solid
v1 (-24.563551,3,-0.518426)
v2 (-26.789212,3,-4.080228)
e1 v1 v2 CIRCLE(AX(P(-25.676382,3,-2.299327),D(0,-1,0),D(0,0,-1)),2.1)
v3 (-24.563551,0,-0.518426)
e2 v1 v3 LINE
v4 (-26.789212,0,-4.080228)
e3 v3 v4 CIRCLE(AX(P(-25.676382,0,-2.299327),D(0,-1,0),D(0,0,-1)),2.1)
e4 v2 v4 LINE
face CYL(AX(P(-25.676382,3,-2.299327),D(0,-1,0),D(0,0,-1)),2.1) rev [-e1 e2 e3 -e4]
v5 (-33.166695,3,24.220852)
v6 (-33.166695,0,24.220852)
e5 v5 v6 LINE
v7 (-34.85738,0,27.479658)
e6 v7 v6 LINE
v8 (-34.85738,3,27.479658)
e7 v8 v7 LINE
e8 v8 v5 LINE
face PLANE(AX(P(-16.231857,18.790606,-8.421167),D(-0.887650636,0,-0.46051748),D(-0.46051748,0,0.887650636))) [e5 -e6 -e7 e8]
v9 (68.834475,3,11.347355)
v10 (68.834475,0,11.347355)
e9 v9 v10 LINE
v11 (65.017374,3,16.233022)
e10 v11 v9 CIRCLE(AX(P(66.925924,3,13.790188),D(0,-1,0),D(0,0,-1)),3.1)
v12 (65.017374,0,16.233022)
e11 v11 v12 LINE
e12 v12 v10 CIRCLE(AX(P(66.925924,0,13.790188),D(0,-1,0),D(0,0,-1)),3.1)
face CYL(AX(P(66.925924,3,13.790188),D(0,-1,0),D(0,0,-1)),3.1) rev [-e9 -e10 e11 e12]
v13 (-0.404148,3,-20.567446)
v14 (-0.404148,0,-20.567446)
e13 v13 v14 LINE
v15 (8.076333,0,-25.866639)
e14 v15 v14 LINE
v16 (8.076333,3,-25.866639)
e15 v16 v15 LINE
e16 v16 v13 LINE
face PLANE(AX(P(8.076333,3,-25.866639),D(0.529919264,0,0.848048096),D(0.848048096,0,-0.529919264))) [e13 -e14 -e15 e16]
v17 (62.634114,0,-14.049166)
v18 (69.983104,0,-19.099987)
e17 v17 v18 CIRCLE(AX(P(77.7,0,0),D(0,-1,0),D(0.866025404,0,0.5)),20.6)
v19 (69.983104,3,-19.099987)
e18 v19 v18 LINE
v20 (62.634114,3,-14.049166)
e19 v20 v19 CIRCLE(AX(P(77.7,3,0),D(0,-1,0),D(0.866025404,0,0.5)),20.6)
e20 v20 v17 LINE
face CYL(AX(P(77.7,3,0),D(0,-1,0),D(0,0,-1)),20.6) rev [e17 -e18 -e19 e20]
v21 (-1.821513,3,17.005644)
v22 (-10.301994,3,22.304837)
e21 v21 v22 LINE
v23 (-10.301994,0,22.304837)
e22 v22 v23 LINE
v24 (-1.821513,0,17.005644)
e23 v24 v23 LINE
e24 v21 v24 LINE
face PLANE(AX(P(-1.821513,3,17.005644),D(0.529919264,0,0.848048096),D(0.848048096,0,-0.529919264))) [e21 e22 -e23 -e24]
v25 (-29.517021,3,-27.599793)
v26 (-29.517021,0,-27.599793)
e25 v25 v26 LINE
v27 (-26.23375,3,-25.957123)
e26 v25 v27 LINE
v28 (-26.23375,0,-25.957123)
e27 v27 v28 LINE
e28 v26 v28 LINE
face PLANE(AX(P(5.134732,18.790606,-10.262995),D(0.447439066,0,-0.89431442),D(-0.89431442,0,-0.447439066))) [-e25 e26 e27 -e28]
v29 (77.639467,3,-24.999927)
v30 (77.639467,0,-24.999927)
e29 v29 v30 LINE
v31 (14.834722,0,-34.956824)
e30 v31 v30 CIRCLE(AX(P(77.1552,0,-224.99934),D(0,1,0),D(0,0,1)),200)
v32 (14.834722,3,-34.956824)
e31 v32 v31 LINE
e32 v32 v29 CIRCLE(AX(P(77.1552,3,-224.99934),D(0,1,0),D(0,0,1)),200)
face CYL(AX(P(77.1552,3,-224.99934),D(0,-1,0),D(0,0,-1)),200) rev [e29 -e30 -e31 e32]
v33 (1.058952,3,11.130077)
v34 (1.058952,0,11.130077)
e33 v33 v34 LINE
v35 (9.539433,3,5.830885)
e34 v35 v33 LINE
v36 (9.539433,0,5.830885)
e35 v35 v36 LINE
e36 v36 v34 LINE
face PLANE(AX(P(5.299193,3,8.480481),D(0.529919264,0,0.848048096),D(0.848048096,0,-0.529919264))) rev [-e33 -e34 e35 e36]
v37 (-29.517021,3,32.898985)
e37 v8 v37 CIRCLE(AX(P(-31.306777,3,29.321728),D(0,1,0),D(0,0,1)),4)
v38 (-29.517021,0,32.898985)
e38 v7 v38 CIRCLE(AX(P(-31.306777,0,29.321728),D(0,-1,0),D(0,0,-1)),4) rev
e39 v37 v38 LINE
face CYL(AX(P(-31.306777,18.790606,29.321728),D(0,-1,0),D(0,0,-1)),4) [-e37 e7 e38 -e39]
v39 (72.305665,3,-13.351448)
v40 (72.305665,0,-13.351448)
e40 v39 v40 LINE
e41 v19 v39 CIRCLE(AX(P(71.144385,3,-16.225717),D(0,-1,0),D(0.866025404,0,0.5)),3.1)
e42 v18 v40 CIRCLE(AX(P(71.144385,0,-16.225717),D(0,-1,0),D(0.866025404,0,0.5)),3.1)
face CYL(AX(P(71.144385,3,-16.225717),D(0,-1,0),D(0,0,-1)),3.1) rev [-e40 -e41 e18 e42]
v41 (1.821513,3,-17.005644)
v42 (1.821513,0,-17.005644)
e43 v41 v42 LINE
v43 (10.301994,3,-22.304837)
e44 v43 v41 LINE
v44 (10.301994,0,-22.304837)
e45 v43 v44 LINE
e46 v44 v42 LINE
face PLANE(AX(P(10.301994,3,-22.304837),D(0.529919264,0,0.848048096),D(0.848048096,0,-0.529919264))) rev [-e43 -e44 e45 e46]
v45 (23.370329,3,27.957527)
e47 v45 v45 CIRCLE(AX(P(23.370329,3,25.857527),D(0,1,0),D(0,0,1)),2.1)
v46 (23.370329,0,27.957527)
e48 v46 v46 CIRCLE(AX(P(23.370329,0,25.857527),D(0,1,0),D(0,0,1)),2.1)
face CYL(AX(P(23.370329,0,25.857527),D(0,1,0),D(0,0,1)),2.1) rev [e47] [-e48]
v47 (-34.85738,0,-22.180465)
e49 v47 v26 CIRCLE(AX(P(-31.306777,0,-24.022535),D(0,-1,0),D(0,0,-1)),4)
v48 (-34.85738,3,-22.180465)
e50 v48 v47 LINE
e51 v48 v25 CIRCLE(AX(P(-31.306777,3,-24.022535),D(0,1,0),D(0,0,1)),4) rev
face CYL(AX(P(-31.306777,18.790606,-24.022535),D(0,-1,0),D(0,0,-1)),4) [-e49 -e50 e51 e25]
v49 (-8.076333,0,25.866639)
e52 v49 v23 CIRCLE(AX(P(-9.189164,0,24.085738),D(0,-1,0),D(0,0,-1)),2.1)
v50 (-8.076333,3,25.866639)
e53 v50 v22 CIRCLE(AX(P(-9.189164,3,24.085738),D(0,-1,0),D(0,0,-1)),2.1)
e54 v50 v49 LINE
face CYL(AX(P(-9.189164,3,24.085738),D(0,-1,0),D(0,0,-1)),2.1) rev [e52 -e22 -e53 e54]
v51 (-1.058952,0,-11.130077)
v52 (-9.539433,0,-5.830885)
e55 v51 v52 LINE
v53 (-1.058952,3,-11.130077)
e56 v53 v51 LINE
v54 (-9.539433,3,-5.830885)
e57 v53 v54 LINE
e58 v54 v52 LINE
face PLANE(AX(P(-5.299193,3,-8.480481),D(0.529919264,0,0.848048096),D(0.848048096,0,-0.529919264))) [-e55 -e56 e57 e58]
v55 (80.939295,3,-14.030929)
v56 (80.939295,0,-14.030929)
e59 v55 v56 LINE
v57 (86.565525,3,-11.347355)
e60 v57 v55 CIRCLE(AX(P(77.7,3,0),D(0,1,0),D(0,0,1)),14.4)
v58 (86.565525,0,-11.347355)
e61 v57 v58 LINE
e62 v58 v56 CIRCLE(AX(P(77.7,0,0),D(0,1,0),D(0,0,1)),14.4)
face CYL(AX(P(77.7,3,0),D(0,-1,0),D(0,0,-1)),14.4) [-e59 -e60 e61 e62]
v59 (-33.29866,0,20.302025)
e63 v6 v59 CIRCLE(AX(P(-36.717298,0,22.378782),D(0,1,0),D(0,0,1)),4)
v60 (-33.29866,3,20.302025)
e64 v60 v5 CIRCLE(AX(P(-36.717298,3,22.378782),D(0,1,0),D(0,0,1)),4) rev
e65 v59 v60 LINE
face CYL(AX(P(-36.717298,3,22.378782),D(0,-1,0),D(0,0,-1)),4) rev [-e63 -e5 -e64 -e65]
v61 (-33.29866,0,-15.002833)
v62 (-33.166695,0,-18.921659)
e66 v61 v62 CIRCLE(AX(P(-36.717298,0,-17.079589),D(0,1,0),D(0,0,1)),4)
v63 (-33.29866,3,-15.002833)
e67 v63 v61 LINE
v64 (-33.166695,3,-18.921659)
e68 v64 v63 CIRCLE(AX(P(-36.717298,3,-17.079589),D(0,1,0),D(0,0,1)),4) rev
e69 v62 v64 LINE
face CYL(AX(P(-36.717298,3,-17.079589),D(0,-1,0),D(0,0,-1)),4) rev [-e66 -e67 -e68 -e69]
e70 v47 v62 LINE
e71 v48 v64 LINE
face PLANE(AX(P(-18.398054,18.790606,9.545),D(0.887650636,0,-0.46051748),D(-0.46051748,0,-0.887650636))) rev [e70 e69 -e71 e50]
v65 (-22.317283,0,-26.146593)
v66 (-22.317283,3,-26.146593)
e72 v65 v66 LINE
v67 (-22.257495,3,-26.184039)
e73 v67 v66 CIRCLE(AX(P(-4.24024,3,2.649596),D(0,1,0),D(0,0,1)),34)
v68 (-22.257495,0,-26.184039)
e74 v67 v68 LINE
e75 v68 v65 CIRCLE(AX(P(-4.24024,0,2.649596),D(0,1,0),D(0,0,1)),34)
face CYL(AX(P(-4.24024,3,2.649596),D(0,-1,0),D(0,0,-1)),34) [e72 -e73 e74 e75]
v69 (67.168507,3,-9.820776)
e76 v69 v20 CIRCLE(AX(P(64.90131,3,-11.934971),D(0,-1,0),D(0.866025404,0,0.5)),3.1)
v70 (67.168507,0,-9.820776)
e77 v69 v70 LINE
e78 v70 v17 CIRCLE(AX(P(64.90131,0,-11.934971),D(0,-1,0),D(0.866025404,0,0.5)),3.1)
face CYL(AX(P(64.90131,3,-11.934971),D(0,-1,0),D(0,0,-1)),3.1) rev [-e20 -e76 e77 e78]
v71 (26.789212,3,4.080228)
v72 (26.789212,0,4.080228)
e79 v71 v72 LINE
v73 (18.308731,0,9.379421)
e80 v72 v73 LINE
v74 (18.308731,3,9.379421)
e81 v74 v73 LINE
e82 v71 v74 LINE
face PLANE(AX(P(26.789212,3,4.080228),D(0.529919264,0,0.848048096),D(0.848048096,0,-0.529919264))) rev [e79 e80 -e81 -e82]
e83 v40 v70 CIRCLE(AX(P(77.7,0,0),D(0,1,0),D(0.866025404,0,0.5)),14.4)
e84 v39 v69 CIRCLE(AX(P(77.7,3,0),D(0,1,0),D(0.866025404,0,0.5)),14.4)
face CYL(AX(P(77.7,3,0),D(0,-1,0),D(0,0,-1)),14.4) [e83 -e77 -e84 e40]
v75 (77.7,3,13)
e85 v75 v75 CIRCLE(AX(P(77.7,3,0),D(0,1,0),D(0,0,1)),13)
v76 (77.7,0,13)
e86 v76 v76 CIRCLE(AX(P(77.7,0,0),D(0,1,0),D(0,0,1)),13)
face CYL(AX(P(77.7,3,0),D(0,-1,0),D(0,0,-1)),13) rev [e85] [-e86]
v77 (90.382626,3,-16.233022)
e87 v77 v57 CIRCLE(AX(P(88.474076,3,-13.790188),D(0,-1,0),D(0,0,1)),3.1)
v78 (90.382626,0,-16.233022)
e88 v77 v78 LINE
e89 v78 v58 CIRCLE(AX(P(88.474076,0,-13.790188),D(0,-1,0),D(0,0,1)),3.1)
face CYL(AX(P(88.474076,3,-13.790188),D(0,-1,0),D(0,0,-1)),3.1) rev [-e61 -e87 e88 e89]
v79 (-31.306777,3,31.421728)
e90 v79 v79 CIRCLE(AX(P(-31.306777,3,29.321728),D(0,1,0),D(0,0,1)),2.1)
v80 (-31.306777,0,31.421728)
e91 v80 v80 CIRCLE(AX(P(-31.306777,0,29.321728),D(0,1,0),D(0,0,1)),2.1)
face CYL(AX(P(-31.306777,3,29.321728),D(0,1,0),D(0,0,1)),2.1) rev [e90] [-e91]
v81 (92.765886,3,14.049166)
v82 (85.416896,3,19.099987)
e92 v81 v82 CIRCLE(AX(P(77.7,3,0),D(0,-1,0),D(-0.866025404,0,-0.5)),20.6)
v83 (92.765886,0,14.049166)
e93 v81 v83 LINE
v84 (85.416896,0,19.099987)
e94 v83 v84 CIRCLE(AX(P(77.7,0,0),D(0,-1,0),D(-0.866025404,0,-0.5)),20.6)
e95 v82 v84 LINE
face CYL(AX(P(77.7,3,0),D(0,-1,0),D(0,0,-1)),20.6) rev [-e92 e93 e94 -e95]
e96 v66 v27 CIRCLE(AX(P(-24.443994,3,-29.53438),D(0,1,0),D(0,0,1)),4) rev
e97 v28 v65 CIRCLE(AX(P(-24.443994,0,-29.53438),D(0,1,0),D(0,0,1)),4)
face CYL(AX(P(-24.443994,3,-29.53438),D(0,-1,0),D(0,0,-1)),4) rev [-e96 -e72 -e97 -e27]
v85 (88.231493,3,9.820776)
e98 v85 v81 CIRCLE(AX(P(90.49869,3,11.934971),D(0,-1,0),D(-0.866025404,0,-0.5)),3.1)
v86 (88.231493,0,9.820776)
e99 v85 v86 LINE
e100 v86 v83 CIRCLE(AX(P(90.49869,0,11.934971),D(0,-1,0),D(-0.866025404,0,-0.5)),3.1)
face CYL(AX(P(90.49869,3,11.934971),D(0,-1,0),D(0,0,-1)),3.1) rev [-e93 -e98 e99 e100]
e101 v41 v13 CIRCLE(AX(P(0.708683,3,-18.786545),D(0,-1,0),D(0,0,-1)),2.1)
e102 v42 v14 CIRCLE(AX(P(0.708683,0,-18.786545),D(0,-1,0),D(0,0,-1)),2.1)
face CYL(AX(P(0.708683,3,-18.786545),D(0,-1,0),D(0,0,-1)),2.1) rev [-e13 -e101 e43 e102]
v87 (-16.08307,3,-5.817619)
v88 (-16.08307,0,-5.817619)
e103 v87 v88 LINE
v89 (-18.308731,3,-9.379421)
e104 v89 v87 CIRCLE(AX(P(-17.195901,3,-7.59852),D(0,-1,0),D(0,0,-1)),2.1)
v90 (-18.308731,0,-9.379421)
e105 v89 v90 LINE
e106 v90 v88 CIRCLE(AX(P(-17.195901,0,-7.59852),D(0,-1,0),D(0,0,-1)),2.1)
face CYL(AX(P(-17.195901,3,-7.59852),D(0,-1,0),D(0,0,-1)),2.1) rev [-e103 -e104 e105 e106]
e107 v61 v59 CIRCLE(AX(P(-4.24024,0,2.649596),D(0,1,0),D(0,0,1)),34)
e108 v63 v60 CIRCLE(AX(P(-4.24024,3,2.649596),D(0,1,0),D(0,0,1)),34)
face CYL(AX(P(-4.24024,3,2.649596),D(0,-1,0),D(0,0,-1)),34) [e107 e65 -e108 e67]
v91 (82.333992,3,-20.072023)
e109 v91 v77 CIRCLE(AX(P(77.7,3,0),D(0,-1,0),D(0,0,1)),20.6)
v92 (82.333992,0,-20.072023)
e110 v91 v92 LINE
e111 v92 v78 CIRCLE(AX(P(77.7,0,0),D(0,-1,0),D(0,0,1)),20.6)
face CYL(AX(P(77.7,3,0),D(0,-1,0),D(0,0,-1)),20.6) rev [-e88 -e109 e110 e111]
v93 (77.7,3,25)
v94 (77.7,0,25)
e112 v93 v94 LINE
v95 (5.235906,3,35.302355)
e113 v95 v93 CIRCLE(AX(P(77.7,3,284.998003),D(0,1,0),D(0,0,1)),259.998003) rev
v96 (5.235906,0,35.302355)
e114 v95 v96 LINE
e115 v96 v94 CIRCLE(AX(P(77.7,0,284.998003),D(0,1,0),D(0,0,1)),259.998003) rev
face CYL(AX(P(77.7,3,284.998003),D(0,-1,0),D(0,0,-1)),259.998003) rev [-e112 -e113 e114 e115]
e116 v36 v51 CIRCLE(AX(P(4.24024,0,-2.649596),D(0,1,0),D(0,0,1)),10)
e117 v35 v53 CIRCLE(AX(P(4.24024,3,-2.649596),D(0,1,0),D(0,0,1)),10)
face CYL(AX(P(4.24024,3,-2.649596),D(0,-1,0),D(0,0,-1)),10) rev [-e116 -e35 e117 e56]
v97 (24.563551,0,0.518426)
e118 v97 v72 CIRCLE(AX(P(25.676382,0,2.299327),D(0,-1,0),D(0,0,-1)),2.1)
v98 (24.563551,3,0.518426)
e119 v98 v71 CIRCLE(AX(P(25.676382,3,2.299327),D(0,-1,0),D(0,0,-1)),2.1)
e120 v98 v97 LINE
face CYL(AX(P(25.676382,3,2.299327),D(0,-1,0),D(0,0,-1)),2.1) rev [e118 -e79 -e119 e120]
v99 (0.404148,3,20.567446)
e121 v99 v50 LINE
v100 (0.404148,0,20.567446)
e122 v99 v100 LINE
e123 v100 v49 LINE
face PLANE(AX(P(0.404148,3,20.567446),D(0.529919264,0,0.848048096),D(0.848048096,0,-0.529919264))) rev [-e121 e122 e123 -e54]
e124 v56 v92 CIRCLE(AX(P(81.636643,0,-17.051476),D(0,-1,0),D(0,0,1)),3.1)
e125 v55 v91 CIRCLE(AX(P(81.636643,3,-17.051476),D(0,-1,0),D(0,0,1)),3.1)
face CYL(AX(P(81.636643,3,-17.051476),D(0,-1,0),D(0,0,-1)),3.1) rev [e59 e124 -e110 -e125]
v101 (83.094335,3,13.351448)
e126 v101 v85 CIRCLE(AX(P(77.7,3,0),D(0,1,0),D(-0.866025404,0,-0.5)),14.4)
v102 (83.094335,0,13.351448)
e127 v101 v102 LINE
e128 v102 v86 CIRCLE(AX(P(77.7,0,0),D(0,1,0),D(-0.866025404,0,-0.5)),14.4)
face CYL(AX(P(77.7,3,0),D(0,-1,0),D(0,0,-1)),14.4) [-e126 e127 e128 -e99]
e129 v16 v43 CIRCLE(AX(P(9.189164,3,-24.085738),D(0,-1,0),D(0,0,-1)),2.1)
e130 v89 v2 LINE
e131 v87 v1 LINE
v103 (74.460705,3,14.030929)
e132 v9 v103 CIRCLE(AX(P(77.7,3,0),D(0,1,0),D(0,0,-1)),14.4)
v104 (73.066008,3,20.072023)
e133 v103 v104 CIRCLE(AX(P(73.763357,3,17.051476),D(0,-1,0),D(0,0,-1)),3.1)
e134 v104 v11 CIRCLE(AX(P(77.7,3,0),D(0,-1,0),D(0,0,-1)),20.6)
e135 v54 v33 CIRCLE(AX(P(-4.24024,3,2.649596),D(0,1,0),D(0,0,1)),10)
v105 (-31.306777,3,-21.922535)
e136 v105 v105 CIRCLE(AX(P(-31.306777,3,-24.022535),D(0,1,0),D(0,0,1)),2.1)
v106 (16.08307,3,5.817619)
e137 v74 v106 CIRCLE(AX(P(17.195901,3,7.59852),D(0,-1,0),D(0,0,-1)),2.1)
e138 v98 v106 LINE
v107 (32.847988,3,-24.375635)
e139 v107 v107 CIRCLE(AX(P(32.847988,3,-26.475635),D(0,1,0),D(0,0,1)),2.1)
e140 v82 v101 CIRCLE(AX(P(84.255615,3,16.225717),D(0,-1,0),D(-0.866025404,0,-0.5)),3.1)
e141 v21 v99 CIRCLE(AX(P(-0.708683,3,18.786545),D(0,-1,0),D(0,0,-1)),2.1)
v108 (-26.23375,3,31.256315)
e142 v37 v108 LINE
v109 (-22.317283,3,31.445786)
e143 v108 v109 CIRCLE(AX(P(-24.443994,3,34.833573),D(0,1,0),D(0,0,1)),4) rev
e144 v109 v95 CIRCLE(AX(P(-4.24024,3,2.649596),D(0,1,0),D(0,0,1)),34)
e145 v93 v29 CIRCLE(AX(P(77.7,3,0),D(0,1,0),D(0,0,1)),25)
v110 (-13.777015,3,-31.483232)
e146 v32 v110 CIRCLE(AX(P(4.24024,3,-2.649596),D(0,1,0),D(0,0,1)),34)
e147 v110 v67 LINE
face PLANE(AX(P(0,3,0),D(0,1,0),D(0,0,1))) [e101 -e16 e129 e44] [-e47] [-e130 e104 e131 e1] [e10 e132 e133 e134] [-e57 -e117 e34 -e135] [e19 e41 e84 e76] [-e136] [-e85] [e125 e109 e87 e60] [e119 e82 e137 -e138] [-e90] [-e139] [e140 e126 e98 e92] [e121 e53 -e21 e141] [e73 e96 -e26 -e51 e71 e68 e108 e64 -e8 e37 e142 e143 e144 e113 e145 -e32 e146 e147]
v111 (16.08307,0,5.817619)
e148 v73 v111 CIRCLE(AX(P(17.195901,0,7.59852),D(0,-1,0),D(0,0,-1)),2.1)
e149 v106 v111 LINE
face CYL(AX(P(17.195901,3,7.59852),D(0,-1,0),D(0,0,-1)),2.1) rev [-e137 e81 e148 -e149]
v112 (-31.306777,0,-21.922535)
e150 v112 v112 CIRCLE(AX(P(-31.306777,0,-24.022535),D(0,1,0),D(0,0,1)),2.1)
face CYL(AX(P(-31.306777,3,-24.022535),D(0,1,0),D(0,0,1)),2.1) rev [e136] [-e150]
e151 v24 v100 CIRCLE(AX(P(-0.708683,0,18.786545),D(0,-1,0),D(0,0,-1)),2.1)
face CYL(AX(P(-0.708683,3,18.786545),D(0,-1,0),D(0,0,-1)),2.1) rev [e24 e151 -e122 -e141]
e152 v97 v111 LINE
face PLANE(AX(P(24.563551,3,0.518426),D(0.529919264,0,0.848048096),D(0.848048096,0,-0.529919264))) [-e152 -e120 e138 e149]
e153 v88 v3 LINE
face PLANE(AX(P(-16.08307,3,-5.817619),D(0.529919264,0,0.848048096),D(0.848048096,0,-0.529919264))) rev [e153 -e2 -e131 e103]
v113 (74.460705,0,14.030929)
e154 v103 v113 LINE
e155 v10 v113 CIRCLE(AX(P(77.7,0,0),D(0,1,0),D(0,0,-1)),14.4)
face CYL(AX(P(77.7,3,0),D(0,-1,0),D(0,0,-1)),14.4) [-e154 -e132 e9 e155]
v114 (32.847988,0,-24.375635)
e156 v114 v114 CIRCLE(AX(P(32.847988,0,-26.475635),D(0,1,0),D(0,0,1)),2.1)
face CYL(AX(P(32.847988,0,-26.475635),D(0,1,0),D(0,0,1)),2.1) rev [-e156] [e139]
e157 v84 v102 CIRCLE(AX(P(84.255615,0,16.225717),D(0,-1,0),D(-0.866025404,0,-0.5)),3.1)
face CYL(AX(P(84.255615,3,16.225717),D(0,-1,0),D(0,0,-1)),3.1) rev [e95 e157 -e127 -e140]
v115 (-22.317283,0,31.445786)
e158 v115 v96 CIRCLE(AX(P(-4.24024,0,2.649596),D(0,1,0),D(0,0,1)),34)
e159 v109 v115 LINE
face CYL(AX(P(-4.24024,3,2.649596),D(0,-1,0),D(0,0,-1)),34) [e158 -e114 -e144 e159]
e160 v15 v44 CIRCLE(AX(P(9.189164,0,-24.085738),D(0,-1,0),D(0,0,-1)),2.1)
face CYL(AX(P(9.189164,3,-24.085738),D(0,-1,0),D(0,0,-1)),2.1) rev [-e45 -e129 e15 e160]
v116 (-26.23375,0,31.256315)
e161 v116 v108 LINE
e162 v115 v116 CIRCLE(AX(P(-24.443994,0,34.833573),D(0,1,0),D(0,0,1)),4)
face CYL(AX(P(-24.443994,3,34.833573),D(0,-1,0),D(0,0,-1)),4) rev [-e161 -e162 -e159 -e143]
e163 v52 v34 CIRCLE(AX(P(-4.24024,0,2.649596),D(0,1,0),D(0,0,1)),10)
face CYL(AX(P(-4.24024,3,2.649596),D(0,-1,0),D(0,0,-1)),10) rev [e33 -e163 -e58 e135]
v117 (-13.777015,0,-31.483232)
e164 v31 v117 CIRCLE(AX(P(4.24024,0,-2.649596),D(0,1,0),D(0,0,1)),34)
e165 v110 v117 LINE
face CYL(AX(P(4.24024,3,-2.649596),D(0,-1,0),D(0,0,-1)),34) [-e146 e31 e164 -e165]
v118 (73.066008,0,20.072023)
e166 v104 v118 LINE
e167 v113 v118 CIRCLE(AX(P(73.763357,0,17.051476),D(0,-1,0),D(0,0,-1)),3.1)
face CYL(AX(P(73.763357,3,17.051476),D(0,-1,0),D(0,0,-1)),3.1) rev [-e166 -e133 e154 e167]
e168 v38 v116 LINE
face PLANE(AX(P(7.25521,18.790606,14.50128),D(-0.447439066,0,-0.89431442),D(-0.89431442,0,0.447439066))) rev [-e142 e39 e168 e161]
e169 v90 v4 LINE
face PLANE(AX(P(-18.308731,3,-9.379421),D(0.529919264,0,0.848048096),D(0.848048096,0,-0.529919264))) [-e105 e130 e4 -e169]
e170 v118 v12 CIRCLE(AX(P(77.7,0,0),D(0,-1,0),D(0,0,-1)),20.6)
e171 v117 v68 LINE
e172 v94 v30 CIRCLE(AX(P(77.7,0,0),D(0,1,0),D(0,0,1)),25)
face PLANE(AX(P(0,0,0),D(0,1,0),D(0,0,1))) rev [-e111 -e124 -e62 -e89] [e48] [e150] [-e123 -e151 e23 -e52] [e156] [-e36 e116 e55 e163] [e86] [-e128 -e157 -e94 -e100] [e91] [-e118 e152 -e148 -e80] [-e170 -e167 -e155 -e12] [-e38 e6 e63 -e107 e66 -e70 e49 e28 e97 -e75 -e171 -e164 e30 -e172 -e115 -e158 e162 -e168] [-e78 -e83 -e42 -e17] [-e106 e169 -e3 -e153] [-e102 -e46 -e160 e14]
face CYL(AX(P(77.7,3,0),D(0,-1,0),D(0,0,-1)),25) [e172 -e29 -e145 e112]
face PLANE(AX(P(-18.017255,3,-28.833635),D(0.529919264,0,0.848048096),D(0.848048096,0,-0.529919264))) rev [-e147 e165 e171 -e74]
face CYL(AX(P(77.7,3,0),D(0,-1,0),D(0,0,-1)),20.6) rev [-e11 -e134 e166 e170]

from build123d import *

# Parameters (mm, degrees)
SKETCH_2_R               = 13
EXTRUDE_1_DEPTH          = 3
CUT_EXTRUDE_2_DEPTH      = 110.084751045
PATTERN_CURVE_1_DEPTH    = 3
CUT_EXTRUDE_4_DEPTH      = 110.084751045
PATTERN_CIRCULAR_1_COUNT = 6
EXTRUDE_2_DEPTH          = 3
HOLE_WIZARD_M4_1_D       = 4.2
FILLET_1_R               = 4
SKETCH1_R                = 2.1
CUT_EXTRUDE1_DEPTH       = 110.084751045


# Read off the part's stored shape, not the designer's step: 곡선 패턴1
with BuildPart() as part:
    # 스케치2 → 보스-돌출1 (new body)
    with BuildSketch(Plane(origin=(0, 0, 0), x_dir=(1, 0, 0), z_dir=(0, 1, 0))):
        with BuildLine():
            ThreePointArc((77.639466647, 24.999926714), (45.838842968, 27.466341176), (14.834721753, 34.956824097))
            ThreePointArc((14.834721753, 34.956824097), (0.14257607, 36.40176879), (-13.777014503, 31.48323159))
            Line((-13.777014503, 31.48323159), (-22.257495465, 26.184038948))
            ThreePointArc((-22.257495465, 26.184038948), (-35.278632699, -16.528292532), (5.235906124, -35.302354942))
            ThreePointArc((5.235906124, -35.302354942), (41.103608721, -27.588473828), (77.7, -25))
            ThreePointArc((77.7, -25), (102.699981679, 0.030266699), (77.639466647, 24.999926714))
        make_face()
        with BuildLine():
            Line((-9.539433123, 5.83088464), (-1.058952162, 11.130077283))
            ThreePointArc((-1.058952162, 11.130077283), (12.720721442, 7.948788963), (9.539433123, -5.83088464))
            Line((9.539433123, -5.83088464), (1.058952162, -11.130077283))
            ThreePointArc((1.058952162, -11.130077283), (-12.720721442, -7.948788963), (-9.539433123, 5.83088464))
        make_face(mode=Mode.SUBTRACT)
        with Locations(Location((77.7, 0, 0), (0, 0, 270))):
            Circle(SKETCH_2_R, mode=Mode.SUBTRACT)
    extrude(amount=EXTRUDE_1_DEPTH)

    # 스케치4 → 컷-돌출2 (cut, through all)
    with BuildSketch(Plane(origin=(0, 0, 0), x_dir=(-1, 0, 0), z_dir=(0, -1, 0))):
        with BuildLine():
            Line((1.82151317, -17.005644102), (10.301994131, -22.304836745))
            ThreePointArc((10.301994131, -22.304836745), (10.970064678, -25.198568201), (8.076333221, -25.866638748))
            Line((8.076333221, -25.866638748), (-0.40414774, -20.567446106))
            ThreePointArc((-0.40414774, -20.567446106), (-1.072218287, -17.673714649), (1.82151317, -17.005644102))
        make_face()
    extrude(amount=-CUT_EXTRUDE_2_DEPTH, mode=Mode.SUBTRACT)

    # 곡선 패턴1 outline → 곡선 패턴1 (cut)
    with BuildSketch(Plane(origin=(0, 0, 0), x_dir=(1, 0, 0), z_dir=(0, 1, 0))):
        with BuildLine():
            Line((24.563551451, -0.518425872), (16.08307049, -5.817618515))
            ThreePointArc((16.08307049, -5.817618515), (15.414999943, -8.711349971), (18.308731399, -9.379420519))
            Line((18.308731399, -9.379420519), (26.789212361, -4.080227876))
            ThreePointArc((26.789212361, -4.080227876), (27.457282908, -1.186496419), (24.563551451, -0.518425872))
        make_face()
        with BuildLine():
            ThreePointArc((-16.08307049, 5.817618515), (-15.414999943, 8.711349971), (-18.308731399, 9.379420519))
            Line((-18.308731399, 9.379420519), (-26.789212361, 4.080227876))
            ThreePointArc((-26.789212361, 4.080227876), (-27.457282908, 1.186496419), (-24.563551451, 0.518425872))
            Line((-24.563551451, 0.518425872), (-16.08307049, 5.817618515))
        make_face()
        with BuildLine():
            Line((8.076333221, 25.866638748), (-0.40414774, 20.567446106))
            ThreePointArc((-0.40414774, 20.567446106), (-1.072218287, 17.673714649), (1.82151317, 17.005644102))
            Line((1.82151317, 17.005644102), (10.301994131, 22.304836745))
            ThreePointArc((10.301994131, 22.304836745), (10.970064678, 25.198568202), (8.076333221, 25.866638748))
        make_face()
    extrude(amount=PATTERN_CURVE_1_DEPTH, mode=Mode.SUBTRACT)

    # 스케치5 → 컷-돌출4 (cut, through all)
    with BuildSketch(Plane(origin=(0, 0, 0), x_dir=(-1, 0, 0), z_dir=(0, -1, 0))):
        with BuildLine():
            ThreePointArc((-73.066008281, -20.072023335), (-68.831471406, -18.593256858), (-65.017373608, -16.233021524))
            ThreePointArc((-65.017373608, -16.233021524), (-64.483090846, -11.881637615), (-68.834474755, -11.347354852))
            ThreePointArc((-68.834474755, -11.347354852), (-71.500640206, -12.997228095), (-74.460704817, -14.030928933))
            ThreePointArc((-74.460704817, -14.030928933), (-76.78390375, -17.748824402), (-73.066008281, -20.072023335))
        make_face()
    cut_extrude_4 = extrude(amount=-CUT_EXTRUDE_4_DEPTH, mode=Mode.SUBTRACT)

    # 원형 패턴1: 컷-돌출4 ×6 about axis, 2 skipped
    pattern_circular_1_axis = Axis((77.7, 3, 0), (0, -1, 0))
    add([cut_extrude_4.rotate(pattern_circular_1_axis, i * 360 / PATTERN_CIRCULAR_1_COUNT) for i in range(1, PATTERN_CIRCULAR_1_COUNT) if i not in (1, 4)], mode=Mode.SUBTRACT)

    # 스케치7 → 보스-돌출2 (add)
    with BuildSketch(Plane.XZ):
        with BuildLine():
            ThreePointArc((-34.857379721, -22.180465117), (-34.155886305, -26.830127811), (-29.517020915, -27.599792717))
            Line((-29.517020915, -27.599792717), (-24.147285754, -24.913232788))
            ThreePointArc((-24.147285754, -24.913232788), (-28.457668053, -21.214942262), (-32.092293027, -16.850741341))
            Line((-32.092293027, -16.850741341), (-34.857379721, -22.180465117))
        make_face()
        with BuildLine():
            ThreePointArc((-29.517020915, 32.898985359), (-34.155886305, 32.129320453), (-34.857379721, 27.479657759))
            Line((-34.857379721, 27.479657759), (-32.092293027, 22.149933984))
            ThreePointArc((-32.092293027, 22.149933984), (-28.457668053, 26.514134904), (-24.147285754, 30.21242543))
            Line((-24.147285754, 30.21242543), (-29.517020915, 32.898985359))
        make_face()
    extrude(amount=-EXTRUDE_2_DEPTH)

    # M4 나선 코일용 탭 드릴1 (through all)
    with Locations(Plane(origin=(0, 3, 0), x_dir=(1, 0, 0), z_dir=(0, 1, 0))):
        with Locations((-31.306777179, 24.022535036), (-31.306777179, -29.321727679)):
            Hole(HOLE_WIZARD_M4_1_D / 2)

    # 필렛1
    fillet_1_edges = [part.edges().sort_by_distance(p)[0] for p in [
        (-24.147285754, 1.5, -24.913232788),
        (-32.092293027, 1.5, -16.850741341),
        (-32.092293027, 1.5, 22.149933984),
        (-24.147285754, 1.5, 30.21242543),
    ]]
    fillet(fillet_1_edges, radius=FILLET_1_R)

    # Sketch1 → Cut-Extrude1 (cut, through all)
    with BuildSketch(Plane(origin=(0, 3, 0), x_dir=(1, 0, 0), z_dir=(0, 1, 0))):
        with Locations(Location((32.847987975, 26.475635233, 0), (0, 0, 270))):
            Circle(SKETCH1_R)
        with Locations(Location((23.37032867, -25.857527018, 0), (0, 0, 270))):
            Circle(SKETCH1_R)
    extrude(amount=-CUT_EXTRUDE1_DEPTH, mode=Mode.SUBTRACT)


solid = part.part
